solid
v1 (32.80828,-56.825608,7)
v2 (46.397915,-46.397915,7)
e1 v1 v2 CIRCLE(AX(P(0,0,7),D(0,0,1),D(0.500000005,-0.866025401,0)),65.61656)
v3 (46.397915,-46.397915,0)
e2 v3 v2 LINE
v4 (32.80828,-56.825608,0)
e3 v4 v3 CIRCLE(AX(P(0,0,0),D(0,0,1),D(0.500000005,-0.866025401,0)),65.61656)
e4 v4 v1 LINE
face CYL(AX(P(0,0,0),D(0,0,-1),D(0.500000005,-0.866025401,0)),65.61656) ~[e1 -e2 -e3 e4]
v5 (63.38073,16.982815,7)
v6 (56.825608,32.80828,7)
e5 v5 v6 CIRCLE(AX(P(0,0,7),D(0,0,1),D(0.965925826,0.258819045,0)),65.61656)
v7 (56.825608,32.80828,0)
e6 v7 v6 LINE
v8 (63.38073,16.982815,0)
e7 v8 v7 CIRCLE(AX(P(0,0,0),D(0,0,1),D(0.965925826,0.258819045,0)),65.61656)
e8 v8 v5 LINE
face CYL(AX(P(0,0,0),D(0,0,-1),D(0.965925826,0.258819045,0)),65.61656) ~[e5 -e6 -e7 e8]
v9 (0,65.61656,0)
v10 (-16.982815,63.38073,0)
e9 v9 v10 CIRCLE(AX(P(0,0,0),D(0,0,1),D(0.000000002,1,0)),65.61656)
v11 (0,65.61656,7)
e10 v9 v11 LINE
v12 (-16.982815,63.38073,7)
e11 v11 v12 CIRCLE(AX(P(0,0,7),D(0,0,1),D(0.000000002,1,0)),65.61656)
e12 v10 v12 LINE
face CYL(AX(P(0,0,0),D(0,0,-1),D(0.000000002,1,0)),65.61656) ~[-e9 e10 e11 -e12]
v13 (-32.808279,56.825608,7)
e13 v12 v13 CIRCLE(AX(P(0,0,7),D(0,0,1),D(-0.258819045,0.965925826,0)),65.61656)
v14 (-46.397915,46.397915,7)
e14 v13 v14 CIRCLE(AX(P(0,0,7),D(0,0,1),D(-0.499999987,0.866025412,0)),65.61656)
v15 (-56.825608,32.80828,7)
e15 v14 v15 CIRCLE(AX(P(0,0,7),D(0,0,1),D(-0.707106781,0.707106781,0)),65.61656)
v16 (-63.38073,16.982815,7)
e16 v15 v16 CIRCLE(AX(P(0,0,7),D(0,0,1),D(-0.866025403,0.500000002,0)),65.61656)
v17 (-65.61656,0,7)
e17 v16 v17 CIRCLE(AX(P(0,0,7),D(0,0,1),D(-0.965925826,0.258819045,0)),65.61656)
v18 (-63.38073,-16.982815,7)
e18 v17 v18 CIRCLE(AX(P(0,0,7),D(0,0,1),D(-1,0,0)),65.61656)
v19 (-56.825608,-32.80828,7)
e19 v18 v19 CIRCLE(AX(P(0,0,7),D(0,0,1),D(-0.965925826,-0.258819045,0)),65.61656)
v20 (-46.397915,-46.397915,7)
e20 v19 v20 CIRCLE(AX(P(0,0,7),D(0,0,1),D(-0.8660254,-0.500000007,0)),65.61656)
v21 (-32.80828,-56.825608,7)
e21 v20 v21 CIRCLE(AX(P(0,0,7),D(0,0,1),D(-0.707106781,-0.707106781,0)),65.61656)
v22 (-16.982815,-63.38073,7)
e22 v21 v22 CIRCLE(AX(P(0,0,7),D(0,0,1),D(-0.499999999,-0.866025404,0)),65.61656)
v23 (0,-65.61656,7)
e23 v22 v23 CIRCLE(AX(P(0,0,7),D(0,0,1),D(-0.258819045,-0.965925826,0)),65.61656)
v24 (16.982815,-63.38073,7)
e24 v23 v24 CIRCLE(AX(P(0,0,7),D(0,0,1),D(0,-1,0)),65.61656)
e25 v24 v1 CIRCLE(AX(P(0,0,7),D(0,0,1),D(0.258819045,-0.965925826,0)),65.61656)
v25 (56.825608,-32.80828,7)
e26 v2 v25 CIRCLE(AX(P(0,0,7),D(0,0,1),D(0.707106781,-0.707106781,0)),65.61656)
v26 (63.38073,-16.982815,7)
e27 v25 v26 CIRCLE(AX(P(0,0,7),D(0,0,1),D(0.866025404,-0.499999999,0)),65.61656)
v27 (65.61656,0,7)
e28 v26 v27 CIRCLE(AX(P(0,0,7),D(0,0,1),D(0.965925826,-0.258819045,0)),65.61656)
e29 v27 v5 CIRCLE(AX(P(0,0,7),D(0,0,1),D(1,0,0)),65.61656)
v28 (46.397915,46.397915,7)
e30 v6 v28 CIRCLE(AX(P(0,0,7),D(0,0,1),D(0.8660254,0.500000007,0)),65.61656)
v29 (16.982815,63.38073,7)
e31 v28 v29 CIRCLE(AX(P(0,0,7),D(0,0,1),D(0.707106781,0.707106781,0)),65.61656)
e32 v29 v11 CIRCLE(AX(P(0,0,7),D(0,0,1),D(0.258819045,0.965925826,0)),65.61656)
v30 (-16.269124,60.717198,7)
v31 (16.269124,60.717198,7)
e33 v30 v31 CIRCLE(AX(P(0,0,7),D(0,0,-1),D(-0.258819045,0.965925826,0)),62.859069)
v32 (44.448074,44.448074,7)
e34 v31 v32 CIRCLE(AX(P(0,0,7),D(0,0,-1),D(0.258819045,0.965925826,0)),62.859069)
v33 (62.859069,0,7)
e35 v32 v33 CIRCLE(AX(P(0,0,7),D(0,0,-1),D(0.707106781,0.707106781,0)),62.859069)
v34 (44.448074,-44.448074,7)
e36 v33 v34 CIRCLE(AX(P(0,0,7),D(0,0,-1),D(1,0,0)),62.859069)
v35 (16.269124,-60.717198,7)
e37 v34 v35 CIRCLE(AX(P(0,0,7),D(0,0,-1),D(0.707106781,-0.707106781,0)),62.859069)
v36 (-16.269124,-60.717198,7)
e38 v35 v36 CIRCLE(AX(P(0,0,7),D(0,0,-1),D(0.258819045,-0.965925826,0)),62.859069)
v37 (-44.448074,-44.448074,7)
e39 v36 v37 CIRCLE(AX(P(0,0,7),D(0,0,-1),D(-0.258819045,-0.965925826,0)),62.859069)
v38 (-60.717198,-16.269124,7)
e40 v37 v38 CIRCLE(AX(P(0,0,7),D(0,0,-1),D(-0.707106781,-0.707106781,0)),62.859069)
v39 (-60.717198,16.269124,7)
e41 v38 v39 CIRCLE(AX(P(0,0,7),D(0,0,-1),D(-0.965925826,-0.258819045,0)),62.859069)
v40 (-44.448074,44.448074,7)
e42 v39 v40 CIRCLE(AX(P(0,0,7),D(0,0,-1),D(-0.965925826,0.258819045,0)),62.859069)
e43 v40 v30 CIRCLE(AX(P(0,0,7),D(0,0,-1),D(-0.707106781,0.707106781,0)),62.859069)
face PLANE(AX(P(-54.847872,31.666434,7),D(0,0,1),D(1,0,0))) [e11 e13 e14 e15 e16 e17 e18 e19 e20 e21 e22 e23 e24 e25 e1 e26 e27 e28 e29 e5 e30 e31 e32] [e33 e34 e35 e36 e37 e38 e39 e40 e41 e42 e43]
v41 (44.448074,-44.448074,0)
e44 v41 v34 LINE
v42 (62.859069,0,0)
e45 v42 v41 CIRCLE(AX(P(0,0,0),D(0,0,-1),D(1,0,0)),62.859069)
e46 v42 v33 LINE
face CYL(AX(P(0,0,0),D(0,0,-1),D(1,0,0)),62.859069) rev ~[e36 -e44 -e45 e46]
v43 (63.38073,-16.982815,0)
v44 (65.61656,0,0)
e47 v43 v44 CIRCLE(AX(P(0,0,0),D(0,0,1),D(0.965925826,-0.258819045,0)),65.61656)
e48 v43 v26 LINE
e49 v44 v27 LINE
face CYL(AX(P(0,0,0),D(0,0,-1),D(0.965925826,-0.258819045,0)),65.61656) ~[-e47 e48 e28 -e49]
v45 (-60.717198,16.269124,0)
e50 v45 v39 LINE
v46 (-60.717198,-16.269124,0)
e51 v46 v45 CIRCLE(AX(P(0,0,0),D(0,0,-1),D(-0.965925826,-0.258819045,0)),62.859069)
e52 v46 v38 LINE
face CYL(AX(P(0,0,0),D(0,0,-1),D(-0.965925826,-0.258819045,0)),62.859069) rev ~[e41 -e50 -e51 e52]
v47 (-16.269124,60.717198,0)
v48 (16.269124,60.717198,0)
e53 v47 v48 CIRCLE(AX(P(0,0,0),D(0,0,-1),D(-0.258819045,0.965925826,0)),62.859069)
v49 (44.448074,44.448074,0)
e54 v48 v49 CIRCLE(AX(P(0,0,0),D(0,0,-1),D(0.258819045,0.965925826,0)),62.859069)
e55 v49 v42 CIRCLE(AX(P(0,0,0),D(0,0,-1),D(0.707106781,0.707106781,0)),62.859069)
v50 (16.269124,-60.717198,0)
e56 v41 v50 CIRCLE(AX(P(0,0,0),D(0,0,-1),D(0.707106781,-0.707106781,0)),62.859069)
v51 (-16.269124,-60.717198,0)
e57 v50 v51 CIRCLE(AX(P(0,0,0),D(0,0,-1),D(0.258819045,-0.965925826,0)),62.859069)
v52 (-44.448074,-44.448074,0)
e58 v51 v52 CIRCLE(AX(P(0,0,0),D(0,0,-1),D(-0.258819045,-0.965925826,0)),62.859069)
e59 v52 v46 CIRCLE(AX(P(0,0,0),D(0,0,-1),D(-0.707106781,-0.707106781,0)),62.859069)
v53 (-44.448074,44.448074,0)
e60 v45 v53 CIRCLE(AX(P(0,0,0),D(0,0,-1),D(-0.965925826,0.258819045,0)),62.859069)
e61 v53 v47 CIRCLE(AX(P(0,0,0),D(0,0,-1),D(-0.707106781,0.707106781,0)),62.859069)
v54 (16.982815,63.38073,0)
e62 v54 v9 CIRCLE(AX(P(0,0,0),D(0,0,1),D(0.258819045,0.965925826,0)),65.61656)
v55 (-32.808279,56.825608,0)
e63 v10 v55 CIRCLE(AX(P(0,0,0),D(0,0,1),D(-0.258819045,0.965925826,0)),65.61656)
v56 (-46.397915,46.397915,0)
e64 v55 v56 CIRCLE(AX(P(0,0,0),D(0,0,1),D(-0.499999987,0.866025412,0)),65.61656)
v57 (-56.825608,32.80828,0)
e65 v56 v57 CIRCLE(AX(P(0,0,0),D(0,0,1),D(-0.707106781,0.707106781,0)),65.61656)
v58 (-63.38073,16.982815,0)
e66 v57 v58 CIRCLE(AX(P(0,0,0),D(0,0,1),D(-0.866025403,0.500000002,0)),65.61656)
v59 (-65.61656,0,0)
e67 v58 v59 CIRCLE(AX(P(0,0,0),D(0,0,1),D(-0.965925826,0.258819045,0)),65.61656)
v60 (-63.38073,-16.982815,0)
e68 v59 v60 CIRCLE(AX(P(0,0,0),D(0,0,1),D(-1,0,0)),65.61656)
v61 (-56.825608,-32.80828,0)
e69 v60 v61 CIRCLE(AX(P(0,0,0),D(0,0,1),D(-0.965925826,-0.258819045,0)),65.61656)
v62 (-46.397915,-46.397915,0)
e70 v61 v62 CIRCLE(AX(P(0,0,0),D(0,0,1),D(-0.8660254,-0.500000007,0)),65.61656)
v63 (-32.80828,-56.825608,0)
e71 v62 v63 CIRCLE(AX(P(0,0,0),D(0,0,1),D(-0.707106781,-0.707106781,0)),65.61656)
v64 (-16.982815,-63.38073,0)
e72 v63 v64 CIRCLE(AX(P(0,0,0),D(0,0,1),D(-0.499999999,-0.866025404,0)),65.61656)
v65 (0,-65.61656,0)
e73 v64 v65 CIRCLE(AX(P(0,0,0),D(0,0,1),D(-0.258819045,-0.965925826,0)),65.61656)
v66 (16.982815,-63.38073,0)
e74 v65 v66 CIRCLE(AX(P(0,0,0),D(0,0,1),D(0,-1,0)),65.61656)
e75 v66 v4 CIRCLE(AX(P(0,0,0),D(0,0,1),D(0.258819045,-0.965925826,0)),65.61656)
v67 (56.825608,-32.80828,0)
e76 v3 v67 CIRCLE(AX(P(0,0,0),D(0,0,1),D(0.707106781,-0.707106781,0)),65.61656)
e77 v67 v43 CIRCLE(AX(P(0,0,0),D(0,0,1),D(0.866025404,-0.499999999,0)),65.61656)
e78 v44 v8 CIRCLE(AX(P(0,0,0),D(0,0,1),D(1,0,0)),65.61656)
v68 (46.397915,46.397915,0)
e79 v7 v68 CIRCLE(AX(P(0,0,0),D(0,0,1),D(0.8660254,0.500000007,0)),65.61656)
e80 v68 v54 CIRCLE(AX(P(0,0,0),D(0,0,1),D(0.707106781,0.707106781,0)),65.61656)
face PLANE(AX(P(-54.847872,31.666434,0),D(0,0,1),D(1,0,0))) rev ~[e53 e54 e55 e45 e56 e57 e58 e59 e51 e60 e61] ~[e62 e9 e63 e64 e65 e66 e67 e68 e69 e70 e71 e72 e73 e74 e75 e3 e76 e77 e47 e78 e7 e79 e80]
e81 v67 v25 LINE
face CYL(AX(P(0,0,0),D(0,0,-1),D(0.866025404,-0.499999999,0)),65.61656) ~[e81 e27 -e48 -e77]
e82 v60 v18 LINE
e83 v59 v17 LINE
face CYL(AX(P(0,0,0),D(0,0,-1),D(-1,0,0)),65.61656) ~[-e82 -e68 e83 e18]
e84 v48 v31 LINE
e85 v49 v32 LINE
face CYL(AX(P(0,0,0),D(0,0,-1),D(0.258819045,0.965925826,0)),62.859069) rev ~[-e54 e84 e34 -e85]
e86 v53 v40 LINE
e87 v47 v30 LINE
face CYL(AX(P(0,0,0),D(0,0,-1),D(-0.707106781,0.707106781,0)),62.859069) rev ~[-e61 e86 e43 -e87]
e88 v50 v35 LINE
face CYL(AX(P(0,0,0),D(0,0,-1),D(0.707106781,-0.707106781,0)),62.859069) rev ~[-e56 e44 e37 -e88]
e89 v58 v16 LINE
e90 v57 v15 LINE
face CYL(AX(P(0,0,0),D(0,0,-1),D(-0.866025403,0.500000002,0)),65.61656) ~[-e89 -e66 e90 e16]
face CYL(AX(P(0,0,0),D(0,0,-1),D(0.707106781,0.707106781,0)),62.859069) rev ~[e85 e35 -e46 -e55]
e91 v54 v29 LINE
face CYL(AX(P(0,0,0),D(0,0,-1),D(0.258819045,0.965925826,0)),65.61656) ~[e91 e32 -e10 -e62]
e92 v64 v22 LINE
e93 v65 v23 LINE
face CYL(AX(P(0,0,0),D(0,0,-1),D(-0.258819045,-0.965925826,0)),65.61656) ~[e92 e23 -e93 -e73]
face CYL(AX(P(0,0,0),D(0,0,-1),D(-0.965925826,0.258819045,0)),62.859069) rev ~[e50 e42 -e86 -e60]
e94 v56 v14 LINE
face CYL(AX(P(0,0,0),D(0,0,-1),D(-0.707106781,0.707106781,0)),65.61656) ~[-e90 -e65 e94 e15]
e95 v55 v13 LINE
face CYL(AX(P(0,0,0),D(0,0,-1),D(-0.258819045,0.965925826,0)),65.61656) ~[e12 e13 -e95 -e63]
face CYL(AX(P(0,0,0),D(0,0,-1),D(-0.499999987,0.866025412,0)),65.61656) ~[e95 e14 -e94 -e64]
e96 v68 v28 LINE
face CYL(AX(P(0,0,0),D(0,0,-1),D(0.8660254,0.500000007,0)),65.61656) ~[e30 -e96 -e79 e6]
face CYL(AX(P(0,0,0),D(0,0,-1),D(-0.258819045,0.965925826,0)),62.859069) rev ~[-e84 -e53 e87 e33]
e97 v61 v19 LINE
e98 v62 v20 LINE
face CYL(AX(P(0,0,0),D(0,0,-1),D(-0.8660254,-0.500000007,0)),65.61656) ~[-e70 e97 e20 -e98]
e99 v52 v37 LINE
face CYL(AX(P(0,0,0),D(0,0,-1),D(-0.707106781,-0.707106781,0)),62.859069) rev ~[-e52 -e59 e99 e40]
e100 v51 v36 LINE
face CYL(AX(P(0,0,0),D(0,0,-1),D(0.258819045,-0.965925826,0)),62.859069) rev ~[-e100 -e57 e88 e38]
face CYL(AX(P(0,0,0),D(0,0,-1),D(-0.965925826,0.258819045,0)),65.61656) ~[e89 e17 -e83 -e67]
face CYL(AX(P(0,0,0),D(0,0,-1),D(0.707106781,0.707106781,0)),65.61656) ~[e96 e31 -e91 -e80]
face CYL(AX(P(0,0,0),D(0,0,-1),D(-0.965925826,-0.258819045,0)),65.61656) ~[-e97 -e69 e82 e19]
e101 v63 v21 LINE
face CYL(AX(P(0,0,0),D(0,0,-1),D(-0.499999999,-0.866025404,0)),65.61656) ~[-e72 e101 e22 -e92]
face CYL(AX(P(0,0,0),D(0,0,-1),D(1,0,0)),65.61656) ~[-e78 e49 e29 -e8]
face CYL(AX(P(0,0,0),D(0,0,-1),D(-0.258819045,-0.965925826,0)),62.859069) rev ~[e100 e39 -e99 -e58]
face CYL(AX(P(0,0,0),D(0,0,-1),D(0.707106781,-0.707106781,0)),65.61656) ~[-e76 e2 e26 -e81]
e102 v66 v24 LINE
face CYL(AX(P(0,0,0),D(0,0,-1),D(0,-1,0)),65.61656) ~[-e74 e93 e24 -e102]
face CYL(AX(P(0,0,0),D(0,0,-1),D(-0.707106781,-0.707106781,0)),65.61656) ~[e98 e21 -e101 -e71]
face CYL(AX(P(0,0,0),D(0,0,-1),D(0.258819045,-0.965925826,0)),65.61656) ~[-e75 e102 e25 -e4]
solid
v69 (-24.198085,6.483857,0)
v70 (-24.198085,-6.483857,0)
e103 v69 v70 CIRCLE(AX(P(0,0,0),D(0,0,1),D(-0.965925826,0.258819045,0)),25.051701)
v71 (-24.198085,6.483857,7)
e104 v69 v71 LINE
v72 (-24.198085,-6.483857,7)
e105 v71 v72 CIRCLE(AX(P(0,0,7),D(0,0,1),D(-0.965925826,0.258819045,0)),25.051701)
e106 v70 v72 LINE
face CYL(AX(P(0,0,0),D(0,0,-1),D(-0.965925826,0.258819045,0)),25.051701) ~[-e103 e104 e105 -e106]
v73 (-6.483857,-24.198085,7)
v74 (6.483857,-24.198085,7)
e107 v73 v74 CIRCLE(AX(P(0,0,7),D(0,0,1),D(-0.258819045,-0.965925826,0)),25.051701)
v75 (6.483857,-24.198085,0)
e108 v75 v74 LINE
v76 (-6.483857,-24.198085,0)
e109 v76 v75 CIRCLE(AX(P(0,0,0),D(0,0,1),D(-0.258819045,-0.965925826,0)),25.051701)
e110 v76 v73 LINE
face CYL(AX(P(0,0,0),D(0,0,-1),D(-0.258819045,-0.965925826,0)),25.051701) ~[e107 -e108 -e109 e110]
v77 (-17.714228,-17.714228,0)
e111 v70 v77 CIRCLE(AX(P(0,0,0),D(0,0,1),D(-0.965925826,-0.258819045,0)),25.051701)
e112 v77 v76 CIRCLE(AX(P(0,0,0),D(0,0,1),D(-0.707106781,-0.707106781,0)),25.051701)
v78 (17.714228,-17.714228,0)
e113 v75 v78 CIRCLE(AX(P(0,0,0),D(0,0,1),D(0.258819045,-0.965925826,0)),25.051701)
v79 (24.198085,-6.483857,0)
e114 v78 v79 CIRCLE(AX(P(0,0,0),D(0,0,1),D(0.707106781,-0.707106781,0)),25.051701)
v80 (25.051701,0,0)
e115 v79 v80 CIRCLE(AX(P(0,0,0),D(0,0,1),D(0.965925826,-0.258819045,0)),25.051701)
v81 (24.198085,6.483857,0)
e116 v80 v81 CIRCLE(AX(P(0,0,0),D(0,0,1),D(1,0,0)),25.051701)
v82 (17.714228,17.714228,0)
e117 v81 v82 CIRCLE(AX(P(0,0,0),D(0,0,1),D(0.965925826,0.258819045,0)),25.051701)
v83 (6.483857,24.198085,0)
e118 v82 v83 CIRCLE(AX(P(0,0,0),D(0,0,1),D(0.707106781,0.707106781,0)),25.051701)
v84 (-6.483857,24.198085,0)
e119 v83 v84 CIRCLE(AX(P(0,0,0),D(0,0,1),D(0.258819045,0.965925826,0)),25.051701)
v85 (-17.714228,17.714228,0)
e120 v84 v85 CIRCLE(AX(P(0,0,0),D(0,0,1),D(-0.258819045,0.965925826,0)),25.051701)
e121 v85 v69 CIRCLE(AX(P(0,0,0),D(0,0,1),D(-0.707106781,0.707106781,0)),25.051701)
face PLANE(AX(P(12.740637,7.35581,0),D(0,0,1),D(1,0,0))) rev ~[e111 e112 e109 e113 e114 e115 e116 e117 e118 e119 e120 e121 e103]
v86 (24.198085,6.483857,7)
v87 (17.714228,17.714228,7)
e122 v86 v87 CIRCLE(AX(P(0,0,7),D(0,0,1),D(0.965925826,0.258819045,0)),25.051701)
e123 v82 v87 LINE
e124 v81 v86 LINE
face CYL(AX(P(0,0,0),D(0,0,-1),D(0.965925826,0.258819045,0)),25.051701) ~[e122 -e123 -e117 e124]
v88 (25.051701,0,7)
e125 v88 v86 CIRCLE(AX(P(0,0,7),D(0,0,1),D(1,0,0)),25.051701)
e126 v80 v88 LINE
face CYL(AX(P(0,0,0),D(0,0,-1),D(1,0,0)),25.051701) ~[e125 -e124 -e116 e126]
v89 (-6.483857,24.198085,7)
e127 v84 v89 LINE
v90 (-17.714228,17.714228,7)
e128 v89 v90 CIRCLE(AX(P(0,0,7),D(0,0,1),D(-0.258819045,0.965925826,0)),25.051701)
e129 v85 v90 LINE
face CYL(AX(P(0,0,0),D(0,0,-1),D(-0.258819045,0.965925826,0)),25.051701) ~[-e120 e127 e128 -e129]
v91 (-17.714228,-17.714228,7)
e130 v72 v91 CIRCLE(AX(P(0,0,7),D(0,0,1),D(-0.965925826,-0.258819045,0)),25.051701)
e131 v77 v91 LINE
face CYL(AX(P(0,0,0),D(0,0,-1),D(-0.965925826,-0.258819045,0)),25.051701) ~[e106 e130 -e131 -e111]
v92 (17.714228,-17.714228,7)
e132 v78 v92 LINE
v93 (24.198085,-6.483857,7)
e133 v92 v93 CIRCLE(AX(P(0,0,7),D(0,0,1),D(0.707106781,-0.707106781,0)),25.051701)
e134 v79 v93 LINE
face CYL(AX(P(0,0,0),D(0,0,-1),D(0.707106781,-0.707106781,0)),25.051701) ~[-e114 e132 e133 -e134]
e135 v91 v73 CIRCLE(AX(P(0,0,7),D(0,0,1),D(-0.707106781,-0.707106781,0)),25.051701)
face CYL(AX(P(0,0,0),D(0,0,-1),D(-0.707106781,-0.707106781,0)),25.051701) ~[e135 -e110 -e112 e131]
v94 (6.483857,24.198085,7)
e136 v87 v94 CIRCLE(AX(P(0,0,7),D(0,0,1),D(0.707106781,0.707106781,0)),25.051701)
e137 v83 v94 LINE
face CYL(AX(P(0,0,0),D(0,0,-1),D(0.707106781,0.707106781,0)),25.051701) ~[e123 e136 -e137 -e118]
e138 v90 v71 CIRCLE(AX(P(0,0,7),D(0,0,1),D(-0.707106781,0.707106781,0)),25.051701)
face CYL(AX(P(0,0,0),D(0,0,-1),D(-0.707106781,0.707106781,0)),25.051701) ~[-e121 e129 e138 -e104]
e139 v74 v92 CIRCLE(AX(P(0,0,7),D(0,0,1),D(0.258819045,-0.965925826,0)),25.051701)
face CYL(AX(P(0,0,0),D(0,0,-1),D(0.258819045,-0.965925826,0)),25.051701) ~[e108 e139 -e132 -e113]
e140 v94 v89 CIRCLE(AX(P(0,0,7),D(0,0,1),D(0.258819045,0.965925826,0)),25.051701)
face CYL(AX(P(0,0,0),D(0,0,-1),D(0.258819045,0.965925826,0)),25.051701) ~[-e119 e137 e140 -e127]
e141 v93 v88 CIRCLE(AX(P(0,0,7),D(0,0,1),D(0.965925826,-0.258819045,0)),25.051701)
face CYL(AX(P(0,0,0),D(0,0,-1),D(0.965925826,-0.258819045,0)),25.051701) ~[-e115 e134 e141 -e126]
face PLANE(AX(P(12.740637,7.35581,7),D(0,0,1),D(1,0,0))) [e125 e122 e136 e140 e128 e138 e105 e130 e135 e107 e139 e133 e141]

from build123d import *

# Parameters (mm, degrees)
F1_DEPTH = 7


# Not quite as in the source:
# - the program builds the solid bodies; features that only make, move or delete a surface that nothing else refers to are left out


with BuildPart() as f1:
    # F0 (on Top) → F1 (new body)
    with BuildSketch(Plane.XY):
        with BuildLine():
            ThreePointArc((-60.7171979996, 16.2691241707), (-54.4375504652, 31.4295344151), (-44.4480738289, 44.4480738289))
            Line((-44.4480738289, 44.4480738289), (-46.3979145079, 46.3979145079))
            ThreePointArc((-46.3979145079, 46.3979145079), (-52.0571169794, 39.9448308691), (-56.8256077619, 32.8082801112))
            ThreePointArc((-56.8256077619, 32.8082801112), (-60.6217967148, 25.1103704558), (-63.3807299004, 16.9828153925))
            Line((-63.3807299004, 16.9828153925), (-60.7171979996, 16.2691241707))
        make_face()
        with BuildLine():
            ThreePointArc((-44.4480738289, 44.4480738289), (-31.4295344151, 54.4375504652), (-16.2691241707, 60.7171979996))
            Line((-16.2691241707, 60.7171979996), (-16.9828153925, 63.3807299004))
            ThreePointArc((-16.9828153925, 63.3807299004), (-25.110369915, 60.6217969388), (-32.8082790973, 56.8256083472))
            ThreePointArc((-32.8082790973, 56.8256083472), (-39.9448304047, 52.0571173357), (-46.3979145079, 46.3979145079))
            Line((-46.3979145079, 46.3979145079), (-44.4480738289, 44.4480738289))
        make_face()
        with BuildLine():
            ThreePointArc((-16.2691241707, 60.7171979996), (0, 62.8590688303), (16.2691241707, 60.7171979996))
            Line((16.2691241707, 60.7171979996), (16.9828153925, 63.3807299004))
            ThreePointArc((16.9828153925, 63.3807299004), (8.5646797863, 65.0552011873), (1.367e-07, 65.6165599629))
            ThreePointArc((1.367e-07, 65.6165599629), (-8.5646796508, 65.0552012051), (-16.9828153925, 63.3807299004))
            Line((-16.9828153925, 63.3807299004), (-16.2691241707, 60.7171979996))
        make_face()
        with BuildLine():
            Line((44.4480738289, 44.4480738289), (46.3979145079, 46.3979145079))
            ThreePointArc((46.3979145079, 46.3979145079), (39.9448310464, 52.0571168432), (32.8082804984, 56.8256075383))
            ThreePointArc((32.8082804984, 56.8256075383), (25.1103706624, 60.6217966293), (16.9828153925, 63.3807299004))
            Line((16.9828153925, 63.3807299004), (16.2691241707, 60.7171979996))
            ThreePointArc((16.2691241707, 60.7171979996), (31.4295344151, 54.4375504652), (44.4480738289, 44.4480738289))
        make_face()
        with BuildLine():
            Line((-63.3807299004, -16.9828153925), (-60.7171979996, -16.2691241707))
            ThreePointArc((-60.7171979996, -16.2691241707), (-62.8590688303, 0), (-60.7171979996, 16.2691241707))
            Line((-60.7171979996, 16.2691241707), (-63.3807299004, 16.9828153925))
            ThreePointArc((-63.3807299004, 16.9828153925), (-65.0552011962, 8.5646797185), (-65.6165599629, 0))
            ThreePointArc((-65.6165599629, 0), (-65.0552011962, -8.5646797185), (-63.3807299004, -16.9828153925))
        make_face()
        with BuildLine():
            Line((-46.3979145079, -46.3979145079), (-44.4480738289, -44.4480738289))
            ThreePointArc((-44.4480738289, -44.4480738289), (-54.4375504652, -31.4295344151), (-60.7171979996, -16.2691241707))
            Line((-60.7171979996, -16.2691241707), (-63.3807299004, -16.9828153925))
            ThreePointArc((-63.3807299004, -16.9828153925), (-60.6217966456, -25.1103706229), (-56.825607581, -32.8082804245))
            ThreePointArc((-56.825607581, -32.8082804245), (-52.0571168692, -39.9448310126), (-46.3979145079, -46.3979145079))
        make_face()
        with BuildLine():
            Line((-16.9828153925, -63.3807299004), (-16.2691241707, -60.7171979996))
            ThreePointArc((-16.2691241707, -60.7171979996), (-31.4295344151, -54.4375504652), (-44.4480738289, -44.4480738289))
            Line((-44.4480738289, -44.4480738289), (-46.3979145079, -46.3979145079))
            ThreePointArc((-46.3979145079, -46.3979145079), (-39.9448307804, -52.0571170474), (-32.8082799176, -56.8256078737))
            ThreePointArc((-32.8082799176, -56.8256078737), (-25.1103703525, -60.6217967576), (-16.9828153925, -63.3807299004))
        make_face()
        with BuildLine():
            Line((16.9828153925, -63.3807299004), (16.2691241707, -60.7171979996))
            ThreePointArc((16.2691241707, -60.7171979996), (0, -62.8590688303), (-16.2691241707, -60.7171979996))
            Line((-16.2691241707, -60.7171979996), (-16.9828153925, -63.3807299004))
            ThreePointArc((-16.9828153925, -63.3807299004), (-8.5646797185, -65.0552011962), (0, -65.6165599629))
            ThreePointArc((0, -65.6165599629), (8.5646797185, -65.0552011962), (16.9828153925, -63.3807299004))
        make_face()
        with BuildLine():
            ThreePointArc((32.8082803048, -56.8256076501), (39.9448309578, -52.0571169113), (46.3979145079, -46.3979145079))
            Line((46.3979145079, -46.3979145079), (44.4480738289, -44.4480738289))
            ThreePointArc((44.4480738289, -44.4480738289), (31.4295344151, -54.4375504652), (16.2691241707, -60.7171979996))
            Line((16.2691241707, -60.7171979996), (16.9828153925, -63.3807299004))
            ThreePointArc((16.9828153925, -63.3807299004), (25.1103705591, -60.621796672), (32.8082803048, -56.8256076501))
        make_face()
        with BuildLine():
            ThreePointArc((56.8256078737, -32.8082799176), (60.6217967576, -25.1103703525), (63.3807299004, -16.9828153925))
            Line((63.3807299004, -16.9828153925), (60.7171979996, -16.2691241707))
            ThreePointArc((60.7171979996, -16.2691241707), (54.4375504652, -31.4295344151), (44.4480738289, -44.4480738289))
            Line((44.4480738289, -44.4480738289), (46.3979145079, -46.3979145079))
            ThreePointArc((46.3979145079, -46.3979145079), (52.0571170474, -39.9448307804), (56.8256078737, -32.8082799176))
        make_face()
        with BuildLine():
            ThreePointArc((63.3807299004, -16.9828153925), (65.0552011962, -8.5646797185), (65.6165599629, 0))
            ThreePointArc((65.6165599629, 0), (65.0552011962, 8.5646797185), (63.3807299004, 16.9828153925))
            Line((63.3807299004, 16.9828153925), (60.7171979996, 16.2691241707))
            ThreePointArc((60.7171979996, 16.2691241707), (62.3213007825, 8.2047549009), (62.8590688303, 0))
            ThreePointArc((62.8590688303, 0), (62.3213007825, -8.2047549009), (60.7171979996, -16.2691241707))
            Line((60.7171979996, -16.2691241707), (63.3807299004, -16.9828153925))
        make_face()
        with BuildLine():
            Line((60.7171979996, 16.2691241707), (63.3807299004, 16.9828153925))
            ThreePointArc((63.3807299004, 16.9828153925), (60.6217966456, 25.1103706229), (56.825607581, 32.8082804245))
            ThreePointArc((56.825607581, 32.8082804245), (52.0571168692, 39.9448310126), (46.3979145079, 46.3979145079))
            Line((46.3979145079, 46.3979145079), (44.4480738289, 44.4480738289))
            ThreePointArc((44.4480738289, 44.4480738289), (54.4375504652, 31.4295344151), (60.7171979996, 16.2691241707))
        make_face()
    extrude(amount=F1_DEPTH)


with BuildPart() as f1b:
    # F0 (on Top) → F1, piece 2 (new body)
    with BuildSketch(Plane.XY):
        with BuildLine():
            Line((0, 0), (24.1980851045, 6.4838573621))
            ThreePointArc((24.1980851045, 6.4838573621), (21.6954095781, 12.5258505601), (17.7142277423, 17.7142277423))
            Line((17.7142277423, 17.7142277423), (0, 0))
        make_face()
        with BuildLine():
            Line((-6.4838573621, 24.1980851045), (0, 0))
            Line((0, 0), (6.4838573621, 24.1980851045))
            ThreePointArc((6.4838573621, 24.1980851045), (0, 25.0517011202), (-6.4838573621, 24.1980851045))
        make_face()
        with BuildLine():
            Line((-17.7142277423, -17.7142277423), (0, 0))
            Line((0, 0), (-24.1980851045, -6.4838573621))
            ThreePointArc((-24.1980851045, -6.4838573621), (-21.6954095781, -12.5258505601), (-17.7142277423, -17.7142277423))
        make_face()
        with BuildLine():
            Line((-6.4838573621, -24.1980851045), (0, 0))
            Line((0, 0), (-17.7142277423, -17.7142277423))
            ThreePointArc((-17.7142277423, -17.7142277423), (-12.5258505601, -21.6954095781), (-6.4838573621, -24.1980851045))
        make_face()
        with BuildLine():
            Line((6.4838573621, -24.1980851045), (0, 0))
            Line((0, 0), (-6.4838573621, -24.1980851045))
            ThreePointArc((-6.4838573621, -24.1980851045), (0, -25.0517011202), (6.4838573621, -24.1980851045))
        make_face()
        with BuildLine():
            Line((17.7142277423, -17.7142277423), (0, 0))
            Line((0, 0), (6.4838573621, -24.1980851045))
            ThreePointArc((6.4838573621, -24.1980851045), (12.5258505601, -21.6954095781), (17.7142277423, -17.7142277423))
        make_face()
        with BuildLine():
            ThreePointArc((17.7142277423, -17.7142277423), (21.6954095781, -12.5258505601), (24.1980851045, -6.4838573621))
            Line((24.1980851045, -6.4838573621), (0, 0))
            Line((0, 0), (17.7142277423, -17.7142277423))
        make_face()
        with BuildLine():
            ThreePointArc((25.0517011202, 0), (24.8373803443, 3.2699031559), (24.1980851045, 6.4838573621))
            Line((24.1980851045, 6.4838573621), (0, 0))
            Line((0, 0), (24.1980851045, -6.4838573621))
            ThreePointArc((24.1980851045, -6.4838573621), (24.8373803443, -3.2699031559), (25.0517011202, 0))
        make_face()
        with BuildLine():
            Line((-17.7142277423, 17.7142277423), (0, 0))
            Line((0, 0), (-6.4838573621, 24.1980851045))
            ThreePointArc((-6.4838573621, 24.1980851045), (-12.5258505601, 21.6954095781), (-17.7142277423, 17.7142277423))
        make_face()
        with BuildLine():
            Line((-24.1980851045, 6.4838573621), (0, 0))
            Line((0, 0), (-17.7142277423, 17.7142277423))
            ThreePointArc((-17.7142277423, 17.7142277423), (-21.6954095781, 12.5258505601), (-24.1980851045, 6.4838573621))
        make_face()
        with BuildLine():
            Line((-24.1980851045, -6.4838573621), (0, 0))
            Line((0, 0), (-24.1980851045, 6.4838573621))
            ThreePointArc((-24.1980851045, 6.4838573621), (-25.0517011202, 0), (-24.1980851045, -6.4838573621))
        make_face()
        with BuildLine():
            Line((0, 0), (17.7142277423, 17.7142277423))
            ThreePointArc((17.7142277423, 17.7142277423), (12.5258505601, 21.6954095781), (6.4838573621, 24.1980851045))
            Line((6.4838573621, 24.1980851045), (0, 0))
        make_face()
    extrude(amount=F1_DEPTH)


solid = Compound([f1.part, f1b.part])
